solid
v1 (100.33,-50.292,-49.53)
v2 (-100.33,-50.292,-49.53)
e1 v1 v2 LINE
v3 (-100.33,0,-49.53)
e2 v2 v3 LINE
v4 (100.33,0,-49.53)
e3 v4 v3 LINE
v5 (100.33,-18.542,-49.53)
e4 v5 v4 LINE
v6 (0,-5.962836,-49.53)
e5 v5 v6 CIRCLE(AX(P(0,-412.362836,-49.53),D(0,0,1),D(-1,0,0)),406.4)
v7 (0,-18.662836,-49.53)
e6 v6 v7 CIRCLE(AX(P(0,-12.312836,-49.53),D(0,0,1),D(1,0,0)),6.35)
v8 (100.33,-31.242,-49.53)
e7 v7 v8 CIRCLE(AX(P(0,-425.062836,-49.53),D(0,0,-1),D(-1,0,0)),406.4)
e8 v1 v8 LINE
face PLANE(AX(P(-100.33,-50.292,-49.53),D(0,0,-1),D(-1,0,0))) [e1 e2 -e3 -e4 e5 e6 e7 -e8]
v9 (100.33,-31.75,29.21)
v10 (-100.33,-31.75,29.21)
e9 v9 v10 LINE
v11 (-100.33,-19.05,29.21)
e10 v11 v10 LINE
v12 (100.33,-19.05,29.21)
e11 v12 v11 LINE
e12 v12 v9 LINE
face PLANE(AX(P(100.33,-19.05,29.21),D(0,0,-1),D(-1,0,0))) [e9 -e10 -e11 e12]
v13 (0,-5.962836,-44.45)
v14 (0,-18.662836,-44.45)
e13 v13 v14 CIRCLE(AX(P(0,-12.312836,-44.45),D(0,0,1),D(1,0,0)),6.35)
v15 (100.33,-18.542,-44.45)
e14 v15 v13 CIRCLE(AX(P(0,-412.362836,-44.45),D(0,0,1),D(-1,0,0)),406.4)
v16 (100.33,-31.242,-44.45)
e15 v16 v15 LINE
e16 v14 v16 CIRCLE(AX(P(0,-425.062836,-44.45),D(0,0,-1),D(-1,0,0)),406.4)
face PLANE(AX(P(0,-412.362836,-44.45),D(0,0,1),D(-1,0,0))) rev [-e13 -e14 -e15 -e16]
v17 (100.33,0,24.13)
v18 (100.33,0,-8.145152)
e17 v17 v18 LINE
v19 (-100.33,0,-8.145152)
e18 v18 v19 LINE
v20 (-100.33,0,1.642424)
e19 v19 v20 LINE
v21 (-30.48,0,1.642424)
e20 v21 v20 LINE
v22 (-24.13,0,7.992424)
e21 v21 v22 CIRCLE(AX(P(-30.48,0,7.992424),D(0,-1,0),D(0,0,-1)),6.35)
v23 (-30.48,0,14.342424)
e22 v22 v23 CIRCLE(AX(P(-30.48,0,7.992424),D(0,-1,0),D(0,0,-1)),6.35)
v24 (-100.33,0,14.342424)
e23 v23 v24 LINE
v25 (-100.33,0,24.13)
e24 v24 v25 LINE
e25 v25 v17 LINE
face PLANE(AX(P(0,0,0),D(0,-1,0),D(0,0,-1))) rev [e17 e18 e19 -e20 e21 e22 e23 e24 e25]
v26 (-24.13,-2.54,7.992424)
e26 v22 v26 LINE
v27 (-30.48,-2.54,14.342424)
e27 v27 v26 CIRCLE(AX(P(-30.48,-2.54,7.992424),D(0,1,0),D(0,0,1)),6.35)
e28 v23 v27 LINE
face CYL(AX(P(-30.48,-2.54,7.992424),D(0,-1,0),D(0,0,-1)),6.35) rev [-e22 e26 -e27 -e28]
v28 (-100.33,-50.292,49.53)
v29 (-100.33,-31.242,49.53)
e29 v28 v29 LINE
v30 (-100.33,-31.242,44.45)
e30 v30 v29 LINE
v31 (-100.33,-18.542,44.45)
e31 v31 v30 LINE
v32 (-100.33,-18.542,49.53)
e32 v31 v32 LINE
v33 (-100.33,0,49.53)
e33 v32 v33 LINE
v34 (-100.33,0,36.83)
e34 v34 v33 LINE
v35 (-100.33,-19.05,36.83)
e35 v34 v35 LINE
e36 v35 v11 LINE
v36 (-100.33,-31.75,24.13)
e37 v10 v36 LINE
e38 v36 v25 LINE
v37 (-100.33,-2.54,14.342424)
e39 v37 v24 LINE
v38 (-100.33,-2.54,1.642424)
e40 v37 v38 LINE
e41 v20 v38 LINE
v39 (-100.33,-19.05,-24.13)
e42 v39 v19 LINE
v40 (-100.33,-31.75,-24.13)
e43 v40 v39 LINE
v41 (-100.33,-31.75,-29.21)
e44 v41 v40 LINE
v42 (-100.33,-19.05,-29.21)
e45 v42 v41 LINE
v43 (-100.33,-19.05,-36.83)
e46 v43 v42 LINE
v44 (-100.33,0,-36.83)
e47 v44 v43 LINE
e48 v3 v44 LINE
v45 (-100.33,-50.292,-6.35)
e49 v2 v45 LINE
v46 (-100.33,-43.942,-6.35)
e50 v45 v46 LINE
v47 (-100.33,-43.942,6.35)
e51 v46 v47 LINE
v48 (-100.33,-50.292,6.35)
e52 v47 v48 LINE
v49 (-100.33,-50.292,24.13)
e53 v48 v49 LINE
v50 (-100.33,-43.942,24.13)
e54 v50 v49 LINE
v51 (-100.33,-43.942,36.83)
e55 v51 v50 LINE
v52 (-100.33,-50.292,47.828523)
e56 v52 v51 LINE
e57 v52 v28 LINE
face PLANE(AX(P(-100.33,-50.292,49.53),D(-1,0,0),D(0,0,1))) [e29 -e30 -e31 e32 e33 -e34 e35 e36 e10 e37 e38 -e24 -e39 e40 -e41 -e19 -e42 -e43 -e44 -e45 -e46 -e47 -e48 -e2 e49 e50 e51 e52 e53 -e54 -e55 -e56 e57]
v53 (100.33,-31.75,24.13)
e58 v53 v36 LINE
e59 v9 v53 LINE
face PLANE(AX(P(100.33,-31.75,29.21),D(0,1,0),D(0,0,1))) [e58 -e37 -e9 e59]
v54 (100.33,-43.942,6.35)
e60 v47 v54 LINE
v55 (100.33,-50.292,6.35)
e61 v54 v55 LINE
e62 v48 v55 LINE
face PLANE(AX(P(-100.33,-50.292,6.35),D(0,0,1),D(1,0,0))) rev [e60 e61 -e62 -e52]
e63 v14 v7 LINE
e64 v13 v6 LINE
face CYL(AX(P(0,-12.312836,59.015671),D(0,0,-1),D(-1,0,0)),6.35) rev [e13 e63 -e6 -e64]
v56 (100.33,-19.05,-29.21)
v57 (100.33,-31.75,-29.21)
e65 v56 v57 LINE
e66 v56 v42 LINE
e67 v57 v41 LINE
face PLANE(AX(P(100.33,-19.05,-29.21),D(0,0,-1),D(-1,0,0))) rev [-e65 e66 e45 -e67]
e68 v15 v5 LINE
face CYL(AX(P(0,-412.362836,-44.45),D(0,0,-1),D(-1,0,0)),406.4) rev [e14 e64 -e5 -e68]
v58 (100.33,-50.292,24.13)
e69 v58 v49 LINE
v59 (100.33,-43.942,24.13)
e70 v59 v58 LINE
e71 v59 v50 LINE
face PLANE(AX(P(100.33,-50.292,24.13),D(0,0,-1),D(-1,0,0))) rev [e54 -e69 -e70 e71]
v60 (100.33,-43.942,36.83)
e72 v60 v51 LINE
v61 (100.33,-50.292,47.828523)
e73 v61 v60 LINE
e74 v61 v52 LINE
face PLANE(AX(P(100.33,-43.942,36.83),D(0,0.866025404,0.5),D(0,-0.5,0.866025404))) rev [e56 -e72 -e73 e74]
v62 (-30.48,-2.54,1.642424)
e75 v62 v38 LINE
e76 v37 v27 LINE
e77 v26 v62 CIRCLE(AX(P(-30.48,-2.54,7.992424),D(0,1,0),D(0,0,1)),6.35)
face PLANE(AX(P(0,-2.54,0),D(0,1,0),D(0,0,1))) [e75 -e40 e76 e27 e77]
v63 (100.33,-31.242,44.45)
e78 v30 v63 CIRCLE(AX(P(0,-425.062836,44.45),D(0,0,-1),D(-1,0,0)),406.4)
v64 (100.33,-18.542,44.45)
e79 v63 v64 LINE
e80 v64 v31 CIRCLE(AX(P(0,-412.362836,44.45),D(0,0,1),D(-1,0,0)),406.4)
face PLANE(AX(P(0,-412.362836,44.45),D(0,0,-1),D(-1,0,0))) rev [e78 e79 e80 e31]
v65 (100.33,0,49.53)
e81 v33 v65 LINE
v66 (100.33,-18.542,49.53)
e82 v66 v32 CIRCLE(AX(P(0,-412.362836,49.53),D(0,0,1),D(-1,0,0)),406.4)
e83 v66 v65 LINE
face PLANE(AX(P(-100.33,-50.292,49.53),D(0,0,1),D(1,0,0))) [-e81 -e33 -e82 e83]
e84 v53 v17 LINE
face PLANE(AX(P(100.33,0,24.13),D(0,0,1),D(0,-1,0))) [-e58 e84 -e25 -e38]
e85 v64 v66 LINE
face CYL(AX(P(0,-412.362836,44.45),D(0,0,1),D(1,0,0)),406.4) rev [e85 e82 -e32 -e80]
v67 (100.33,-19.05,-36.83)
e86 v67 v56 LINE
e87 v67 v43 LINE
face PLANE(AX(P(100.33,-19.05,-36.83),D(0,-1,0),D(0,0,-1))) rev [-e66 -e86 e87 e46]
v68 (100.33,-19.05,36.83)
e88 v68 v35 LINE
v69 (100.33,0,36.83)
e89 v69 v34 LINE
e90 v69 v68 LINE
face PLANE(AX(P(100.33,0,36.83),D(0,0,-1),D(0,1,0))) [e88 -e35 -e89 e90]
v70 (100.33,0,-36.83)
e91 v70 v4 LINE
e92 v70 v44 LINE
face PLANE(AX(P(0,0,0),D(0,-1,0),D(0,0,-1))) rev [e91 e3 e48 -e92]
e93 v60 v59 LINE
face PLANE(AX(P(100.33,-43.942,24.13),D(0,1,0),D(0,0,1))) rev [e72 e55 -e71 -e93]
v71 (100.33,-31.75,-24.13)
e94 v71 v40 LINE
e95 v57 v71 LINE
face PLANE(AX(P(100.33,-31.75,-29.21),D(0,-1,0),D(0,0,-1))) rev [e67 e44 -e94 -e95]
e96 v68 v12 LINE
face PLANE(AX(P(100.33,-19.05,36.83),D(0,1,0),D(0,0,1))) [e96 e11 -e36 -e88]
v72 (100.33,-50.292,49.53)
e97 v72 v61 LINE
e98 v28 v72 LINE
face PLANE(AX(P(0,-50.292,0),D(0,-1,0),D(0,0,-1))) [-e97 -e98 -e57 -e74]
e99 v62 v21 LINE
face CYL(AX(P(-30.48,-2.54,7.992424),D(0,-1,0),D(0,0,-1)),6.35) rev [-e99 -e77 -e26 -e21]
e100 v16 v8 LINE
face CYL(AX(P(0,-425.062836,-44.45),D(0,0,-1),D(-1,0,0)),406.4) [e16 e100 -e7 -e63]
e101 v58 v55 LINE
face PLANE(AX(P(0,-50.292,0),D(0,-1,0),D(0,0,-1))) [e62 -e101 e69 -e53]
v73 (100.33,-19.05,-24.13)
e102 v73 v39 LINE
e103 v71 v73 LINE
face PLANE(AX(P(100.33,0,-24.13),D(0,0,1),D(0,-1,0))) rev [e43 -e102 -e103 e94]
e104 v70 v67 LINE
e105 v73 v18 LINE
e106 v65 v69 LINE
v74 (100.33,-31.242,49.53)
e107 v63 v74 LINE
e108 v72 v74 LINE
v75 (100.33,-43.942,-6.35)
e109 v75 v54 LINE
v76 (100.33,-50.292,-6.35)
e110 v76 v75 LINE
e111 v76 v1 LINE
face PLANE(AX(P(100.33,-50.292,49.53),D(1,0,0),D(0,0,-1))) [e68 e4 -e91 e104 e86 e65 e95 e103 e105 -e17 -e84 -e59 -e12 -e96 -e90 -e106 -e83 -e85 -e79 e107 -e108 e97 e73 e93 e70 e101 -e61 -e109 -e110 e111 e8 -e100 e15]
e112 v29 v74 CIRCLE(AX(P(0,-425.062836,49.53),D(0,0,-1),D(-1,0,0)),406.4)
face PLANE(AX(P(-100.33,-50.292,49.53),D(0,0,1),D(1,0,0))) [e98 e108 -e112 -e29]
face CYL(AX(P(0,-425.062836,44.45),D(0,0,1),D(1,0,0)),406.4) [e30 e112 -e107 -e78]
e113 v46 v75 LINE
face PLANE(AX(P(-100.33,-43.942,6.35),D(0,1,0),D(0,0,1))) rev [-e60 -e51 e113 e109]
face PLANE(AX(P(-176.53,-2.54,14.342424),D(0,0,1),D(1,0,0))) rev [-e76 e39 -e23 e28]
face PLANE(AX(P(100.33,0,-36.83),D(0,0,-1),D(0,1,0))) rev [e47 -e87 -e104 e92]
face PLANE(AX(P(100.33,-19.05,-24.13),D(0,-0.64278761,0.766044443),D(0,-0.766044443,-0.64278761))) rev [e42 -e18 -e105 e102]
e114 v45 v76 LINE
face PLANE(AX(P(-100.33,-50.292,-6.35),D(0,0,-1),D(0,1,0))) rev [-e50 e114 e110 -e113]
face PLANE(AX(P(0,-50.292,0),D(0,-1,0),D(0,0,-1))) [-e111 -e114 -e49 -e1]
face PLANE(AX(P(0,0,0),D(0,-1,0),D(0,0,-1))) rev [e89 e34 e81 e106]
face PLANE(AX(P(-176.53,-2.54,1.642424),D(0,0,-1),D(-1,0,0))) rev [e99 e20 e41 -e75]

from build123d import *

# Parameters (mm, degrees)
SKETCH1_W           = 200.66
SKETCH1_H           = 99.06
BOSS_EXTRUDE1_DEPTH = 50.292
SKETCH2_W           = 12.7
SKETCH2_H           = 19.05
CUT_EXTRUDE1_DEPTH  = 213.713285349
SKETCH3_W           = 5.08
SKETCH3_H           = 12.7
CUT_EXTRUDE2_DEPTH  = 213.713285349
CUT_EXTRUDE3_DEPTH  = 213.713285349
BOSS_EXTRUDE2_DEPTH = 200.66
SKETCH6_W           = 12.7
SKETCH6_H           = 6.35
CUT_EXTRUDE4_DEPTH  = 213.713285349
CUT_EXTRUDE5_DEPTH  = 213.713285349
CUT_EXTRUDE6_DEPTH  = 5.08
BOSS_EXTRUDE3_DEPTH = 5.08
SKETCH13_W          = 152.4
SKETCH13_H          = 12.7
CUT_EXTRUDE7_DEPTH  = 2.54
FILLET1_R           = 6.35


with BuildPart() as part:
    # Sketch1 → Boss-Extrude1 (new body)
    with BuildSketch(Plane(origin=(0, 0, 0), x_dir=(1, 0, 0), z_dir=(0, 1, 0))):
        Rectangle(SKETCH1_W, SKETCH1_H)
    extrude(amount=-BOSS_EXTRUDE1_DEPTH)

    # Sketch2 → Cut-Extrude1 (cut, through all)
    with BuildSketch(Plane.ZY.offset(100.33)):
        with Locations((-30.48, -9.525)):
            Rectangle(SKETCH2_W, SKETCH2_H)
    cut_extrude1 = extrude(amount=-CUT_EXTRUDE1_DEPTH, mode=Mode.SUBTRACT)

    # Sketch3 → Cut-Extrude2 (cut, through all)
    with BuildSketch(Plane.ZY.offset(100.33)):
        with Locations((-26.67, -25.4)):
            Rectangle(SKETCH3_W, SKETCH3_H)
    cut_extrude2 = extrude(amount=-CUT_EXTRUDE2_DEPTH, mode=Mode.SUBTRACT)

    # Sketch4 → Cut-Extrude3 (cut, through all)
    with BuildSketch(Plane.ZY.offset(100.33)):
        Polygon((-24.13, -19.05), (-8.145152026, 0), (-24.13, 0), align=None)
    cut_extrude3 = extrude(amount=-CUT_EXTRUDE3_DEPTH, mode=Mode.SUBTRACT)

    # Mirror1: Cut-Extrude1, Cut-Extrude2, Cut-Extrude3 across plane
    add(cut_extrude1.mirror(Plane.XY), mode=Mode.SUBTRACT)
    add(cut_extrude2.mirror(Plane.XY), mode=Mode.SUBTRACT)
    add(cut_extrude3.mirror(Plane.XY), mode=Mode.SUBTRACT)

    # Sketch5 → Boss-Extrude2 (add)
    with BuildSketch(Plane(origin=(100.33, 0, 0), x_dir=(0, 0, -1), z_dir=(1, 0, 0))):
        Polygon((-24.13, -19.05), (-8.145152026, 0), (-24.13, 0), align=None)
    extrude(amount=-BOSS_EXTRUDE2_DEPTH)

    # Sketch6 → Cut-Extrude4 (cut, through all)
    with BuildSketch(Plane(origin=(100.33, 0, 0), x_dir=(0, 0, -1), z_dir=(1, 0, 0))):
        with Locations((0, -47.117)):
            Rectangle(SKETCH6_W, SKETCH6_H)
    extrude(amount=-CUT_EXTRUDE4_DEPTH, mode=Mode.SUBTRACT)

    # Sketch7 → Cut-Extrude5 (cut, through all)
    with BuildSketch(Plane.ZY.offset(100.33)):
        Polygon((24.13, -50.292), (24.13, -43.942), (36.83, -43.942), (47.828522628, -50.292), align=None)
    extrude(amount=-CUT_EXTRUDE5_DEPTH, mode=Mode.SUBTRACT)

    # Sketch8 → Cut-Extrude6 (cut)
    with BuildSketch(Plane.XY.offset(49.53)):
        with BuildLine():
            Line((-100.33, -18.542), (-100.33, -31.242))
            ThreePointArc((-100.33, -31.242), (0, -18.662836295), (100.33, -31.242))
            Line((100.33, -31.242), (100.33, -18.542))
            ThreePointArc((100.33, -18.542), (0, -5.962836295), (-100.33, -18.542))
        make_face()
    cut_extrude6 = extrude(amount=-CUT_EXTRUDE6_DEPTH, mode=Mode.SUBTRACT)

    # Mirror2: Cut-Extrude6 across plane
    add(cut_extrude6.mirror(Plane.XY), mode=Mode.SUBTRACT)

    # Sketch9 → Boss-Extrude3 (add)
    with BuildSketch(Plane(origin=(0, 0, -49.53), x_dir=(-1, 0, 0), z_dir=(0, 0, -1))):
        with BuildLine():
            Line((100.33, -18.542), (100.33, -31.242))
            ThreePointArc((100.33, -31.242), (50.5577498, -21.819889754), (0, -18.662836295))
            ThreePointArc((0, -18.662836295), (6.35, -12.312836295), (0, -5.962836295))
            ThreePointArc((0, -5.962836295), (50.5577498, -9.119889754), (100.33, -18.542))
        make_face()
    extrude(amount=-BOSS_EXTRUDE3_DEPTH)

    # Sketch13 → Cut-Extrude7 (cut)
    with BuildSketch(Plane(origin=(0, 0, 0), x_dir=(1, 0, 0), z_dir=(0, 1, 0))):
        with Locations((-100.33, -7.992423987)):
            Rectangle(SKETCH13_W, SKETCH13_H)
    extrude(amount=-CUT_EXTRUDE7_DEPTH, mode=Mode.SUBTRACT)

    # Fillet1
    fillet1_edges = [part.edges().sort_by_distance(p)[0] for p in [
        (-24.13, -1.27, 14.342423987),
        (-24.13, -1.27, 1.642423987),
    ]]
    fillet(fillet1_edges, radius=FILLET1_R - 0.0001)  # a hair under: the kernel refuses the full size


solid = part.part
